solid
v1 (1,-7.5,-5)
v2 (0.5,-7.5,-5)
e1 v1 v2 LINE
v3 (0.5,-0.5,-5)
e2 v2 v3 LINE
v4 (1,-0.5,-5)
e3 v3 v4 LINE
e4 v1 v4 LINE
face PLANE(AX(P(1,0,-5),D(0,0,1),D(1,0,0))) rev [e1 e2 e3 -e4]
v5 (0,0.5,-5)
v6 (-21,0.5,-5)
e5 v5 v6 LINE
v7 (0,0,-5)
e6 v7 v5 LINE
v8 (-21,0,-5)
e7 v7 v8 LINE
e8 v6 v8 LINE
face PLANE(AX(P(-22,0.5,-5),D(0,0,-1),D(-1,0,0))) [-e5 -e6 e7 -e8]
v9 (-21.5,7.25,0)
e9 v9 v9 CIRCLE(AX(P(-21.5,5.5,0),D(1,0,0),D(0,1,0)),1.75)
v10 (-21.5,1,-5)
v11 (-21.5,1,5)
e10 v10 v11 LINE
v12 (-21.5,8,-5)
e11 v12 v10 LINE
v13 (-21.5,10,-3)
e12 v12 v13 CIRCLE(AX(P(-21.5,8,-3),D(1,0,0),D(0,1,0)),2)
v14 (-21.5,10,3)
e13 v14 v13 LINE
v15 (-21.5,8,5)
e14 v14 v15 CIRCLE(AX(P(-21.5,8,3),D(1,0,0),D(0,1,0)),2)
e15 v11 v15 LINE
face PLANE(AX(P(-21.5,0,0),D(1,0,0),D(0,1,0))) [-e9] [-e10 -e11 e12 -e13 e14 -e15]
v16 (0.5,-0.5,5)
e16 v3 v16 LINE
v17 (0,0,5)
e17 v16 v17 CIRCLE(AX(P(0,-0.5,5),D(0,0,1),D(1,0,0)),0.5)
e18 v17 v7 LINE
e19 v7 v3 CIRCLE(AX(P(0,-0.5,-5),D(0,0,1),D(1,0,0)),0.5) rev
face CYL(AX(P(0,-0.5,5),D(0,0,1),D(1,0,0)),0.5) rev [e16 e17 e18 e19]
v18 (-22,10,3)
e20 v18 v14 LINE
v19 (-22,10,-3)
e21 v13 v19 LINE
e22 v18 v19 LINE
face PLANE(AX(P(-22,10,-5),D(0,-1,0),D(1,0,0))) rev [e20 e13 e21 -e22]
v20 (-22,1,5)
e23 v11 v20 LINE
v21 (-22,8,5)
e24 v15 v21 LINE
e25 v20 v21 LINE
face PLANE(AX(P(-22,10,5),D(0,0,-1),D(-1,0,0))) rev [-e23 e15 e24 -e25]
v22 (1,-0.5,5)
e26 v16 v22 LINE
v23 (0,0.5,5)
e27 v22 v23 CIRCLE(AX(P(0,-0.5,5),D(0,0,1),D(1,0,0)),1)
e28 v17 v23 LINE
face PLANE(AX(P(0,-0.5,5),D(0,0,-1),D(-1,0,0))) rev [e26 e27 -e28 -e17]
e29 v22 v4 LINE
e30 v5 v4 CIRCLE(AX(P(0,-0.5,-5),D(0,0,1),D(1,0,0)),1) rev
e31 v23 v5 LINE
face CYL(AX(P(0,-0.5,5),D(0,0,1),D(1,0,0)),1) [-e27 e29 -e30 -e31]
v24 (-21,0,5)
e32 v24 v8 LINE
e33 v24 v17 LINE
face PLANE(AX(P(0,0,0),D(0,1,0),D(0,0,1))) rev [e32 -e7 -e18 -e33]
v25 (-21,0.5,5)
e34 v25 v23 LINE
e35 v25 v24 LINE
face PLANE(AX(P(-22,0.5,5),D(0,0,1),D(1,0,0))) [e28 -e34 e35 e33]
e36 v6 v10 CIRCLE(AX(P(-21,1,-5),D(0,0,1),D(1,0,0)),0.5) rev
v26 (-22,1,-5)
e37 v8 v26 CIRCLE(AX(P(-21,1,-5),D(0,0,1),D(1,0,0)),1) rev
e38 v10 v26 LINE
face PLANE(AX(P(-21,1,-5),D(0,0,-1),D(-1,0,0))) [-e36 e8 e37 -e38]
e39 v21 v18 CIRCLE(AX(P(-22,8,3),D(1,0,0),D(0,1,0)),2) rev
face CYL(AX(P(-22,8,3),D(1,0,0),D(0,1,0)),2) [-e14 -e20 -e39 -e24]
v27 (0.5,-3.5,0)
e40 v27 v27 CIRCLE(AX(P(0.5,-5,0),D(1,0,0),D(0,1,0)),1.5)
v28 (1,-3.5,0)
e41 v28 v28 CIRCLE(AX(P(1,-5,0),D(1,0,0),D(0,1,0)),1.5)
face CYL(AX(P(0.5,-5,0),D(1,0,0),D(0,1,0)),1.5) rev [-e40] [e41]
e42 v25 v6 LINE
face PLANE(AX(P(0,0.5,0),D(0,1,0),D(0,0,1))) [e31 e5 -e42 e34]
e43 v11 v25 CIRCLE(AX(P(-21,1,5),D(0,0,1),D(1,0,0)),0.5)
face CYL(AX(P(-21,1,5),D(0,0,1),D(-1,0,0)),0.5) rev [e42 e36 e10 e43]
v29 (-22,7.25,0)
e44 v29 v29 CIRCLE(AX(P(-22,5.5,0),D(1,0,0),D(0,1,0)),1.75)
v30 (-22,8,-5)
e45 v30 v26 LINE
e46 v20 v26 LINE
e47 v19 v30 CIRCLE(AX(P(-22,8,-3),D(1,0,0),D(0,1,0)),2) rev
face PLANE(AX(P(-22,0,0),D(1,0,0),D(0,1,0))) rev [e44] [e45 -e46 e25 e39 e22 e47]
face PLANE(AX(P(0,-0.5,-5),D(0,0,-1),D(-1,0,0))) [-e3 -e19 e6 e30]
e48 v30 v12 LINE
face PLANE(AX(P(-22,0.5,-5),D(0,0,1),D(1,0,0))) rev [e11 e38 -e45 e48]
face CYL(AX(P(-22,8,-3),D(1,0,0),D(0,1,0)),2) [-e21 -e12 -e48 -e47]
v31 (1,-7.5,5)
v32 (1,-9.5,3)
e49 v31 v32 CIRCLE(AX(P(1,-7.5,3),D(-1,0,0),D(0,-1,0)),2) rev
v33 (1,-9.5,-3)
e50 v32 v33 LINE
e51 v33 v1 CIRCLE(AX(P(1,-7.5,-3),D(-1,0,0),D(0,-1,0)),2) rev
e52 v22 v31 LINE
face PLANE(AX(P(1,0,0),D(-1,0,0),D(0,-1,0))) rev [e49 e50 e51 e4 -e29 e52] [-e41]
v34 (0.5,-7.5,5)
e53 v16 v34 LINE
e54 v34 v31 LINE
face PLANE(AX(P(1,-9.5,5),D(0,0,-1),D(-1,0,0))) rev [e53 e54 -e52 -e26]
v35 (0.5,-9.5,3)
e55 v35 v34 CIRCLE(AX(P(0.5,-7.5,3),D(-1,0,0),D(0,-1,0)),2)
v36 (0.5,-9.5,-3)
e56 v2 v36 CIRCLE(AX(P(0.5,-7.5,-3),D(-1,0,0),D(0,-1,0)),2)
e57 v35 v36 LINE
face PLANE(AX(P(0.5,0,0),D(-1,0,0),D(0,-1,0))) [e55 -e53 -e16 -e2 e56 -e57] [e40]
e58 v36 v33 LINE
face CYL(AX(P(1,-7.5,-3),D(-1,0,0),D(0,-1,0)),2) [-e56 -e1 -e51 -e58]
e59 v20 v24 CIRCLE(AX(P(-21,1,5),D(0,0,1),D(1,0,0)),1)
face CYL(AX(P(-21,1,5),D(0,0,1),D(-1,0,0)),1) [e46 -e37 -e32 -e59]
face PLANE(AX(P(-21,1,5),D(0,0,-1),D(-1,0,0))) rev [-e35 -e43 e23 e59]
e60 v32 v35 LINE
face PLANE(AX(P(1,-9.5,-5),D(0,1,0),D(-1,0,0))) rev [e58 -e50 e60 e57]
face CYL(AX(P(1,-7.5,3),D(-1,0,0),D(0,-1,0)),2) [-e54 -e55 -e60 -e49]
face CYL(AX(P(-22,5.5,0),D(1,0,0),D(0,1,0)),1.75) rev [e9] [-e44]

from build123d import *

# Parameters (mm, degrees)
SKETCH_1_W                       = 23
SKETCH_1_H                       = 10
EXTRUDE_1_DEPTH                  = 0.5
SM_EDGE_FLANGE_1_STRIP_W         = 3
SM_EDGE_FLANGE_1_STRIP_H         = 0.5
SM_EDGE_FLANGE_1_STRIP_CUT_DEPTH = 10
SM_EDGE_FLANGE_1_DEPTH           = 10
SM_EDGE_FLANGE_2_STRIP_W         = 3
SM_EDGE_FLANGE_2_STRIP_H         = 0.5
SM_EDGE_FLANGE_2_STRIP_CUT_DEPTH = 10
SM_EDGE_FLANGE_2_DEPTH           = 10
SKETCH_12_R                      = 1.5
CUT_EXTRUDE_1_DEPTH              = 0.5
SKETCH_13_R                      = 1.75
CUT_EXTRUDE_2_DEPTH              = 0.5
FILLET_1_R                       = 2


# Sheet-metal steps are written as plain solids
with BuildPart() as part:
    # Sketch 1 → Бобышка-Вытянуть1 (new body)
    with BuildSketch(Plane(origin=(0, 0, 0), x_dir=(1, 0, 0), z_dir=(0, 1, 0))):
        with Locations((-10.5, 0)):
            Rectangle(SKETCH_1_W, SKETCH_1_H)
    extrude(amount=EXTRUDE_1_DEPTH)

    # Ребро-кромка1 strip (across the edge) → Ребро-кромка1 strip cut (cut)
    with BuildSketch(Plane(origin=(1, 0, -5), x_dir=(-1, 0, 0), z_dir=(0, 0, 1))):
        with Locations((-0.5, -0.25)):
            Rectangle(SM_EDGE_FLANGE_1_STRIP_W, SM_EDGE_FLANGE_1_STRIP_H)
    extrude(amount=SM_EDGE_FLANGE_1_STRIP_CUT_DEPTH, mode=Mode.SUBTRACT)

    # Ребро-кромка1 section (across the edge) → Ребро-кромка1 (add)
    with BuildSketch(Plane(origin=(1, 0, -5), x_dir=(-1, 0, 0), z_dir=(0, 0, 1))):
        with BuildLine():
            Line((0, 0.5), (0, 9.5))
            Line((0, 9.5), (0.5, 9.5))
            Line((0.5, 9.5), (0.5, 0.5))
            ThreePointArc((0.5, 0.5), (0.646446609, 0.146446609), (1, 0))
            Line((1, 0), (1, -0.5))
            ThreePointArc((1, -0.5), (0.292893219, -0.207106781), (0, 0.5))
        make_face()
    extrude(amount=SM_EDGE_FLANGE_1_DEPTH)

    # Ребро-кромка2 strip (across the edge) → Ребро-кромка2 strip cut (cut)
    with BuildSketch(Plane(origin=(-22, 0.5, -5), x_dir=(1, 0, 0), z_dir=(0, 0, 1))):
        with Locations((-0.5, -0.25)):
            Rectangle(SM_EDGE_FLANGE_2_STRIP_W, SM_EDGE_FLANGE_2_STRIP_H)
    extrude(amount=SM_EDGE_FLANGE_2_STRIP_CUT_DEPTH, mode=Mode.SUBTRACT)

    # Ребро-кромка2 section (across the edge) → Ребро-кромка2 (add)
    with BuildSketch(Plane(origin=(-22, 0.5, -5), x_dir=(1, 0, 0), z_dir=(0, 0, 1))):
        with BuildLine():
            Line((0, 0.5), (0, 9.5))
            Line((0, 9.5), (0.5, 9.5))
            Line((0.5, 9.5), (0.5, 0.5))
            ThreePointArc((0.5, 0.5), (0.646446609, 0.146446609), (1, 0))
            Line((1, 0), (1, -0.5))
            ThreePointArc((1, -0.5), (0.292893219, -0.207106781), (0, 0.5))
        make_face()
    extrude(amount=SM_EDGE_FLANGE_2_DEPTH)

    # Эскиз12 → Вырез-Вытянуть1 (cut)
    with BuildSketch(Plane(origin=(1, 0, 0), x_dir=(0, 0, -1), z_dir=(1, 0, 0))):
        with Locations(Location((0, -5, 0), (0, 0, 90))):
            Circle(SKETCH_12_R)
    extrude(amount=-CUT_EXTRUDE_1_DEPTH, mode=Mode.SUBTRACT)

    # Эскиз13 → Вырез-Вытянуть2 (cut)
    with BuildSketch(Plane(origin=(-21.5, 0, 0), x_dir=(0, 0, -1), z_dir=(1, 0, 0))):
        with Locations(Location((0, 5.5, 0), (0, 0, 90))):
            Circle(SKETCH_13_R)
    extrude(amount=-CUT_EXTRUDE_2_DEPTH, mode=Mode.SUBTRACT)

    # Скругление1
    fillet_1_edges = [part.edges().sort_by_distance(p)[0] for p in [
        (0.75, -9.5, -5),
        (0.75, -9.5, 5),
        (-21.75, 10, -5),
        (-21.75, 10, 5),
    ]]
    fillet(fillet_1_edges, radius=FILLET_1_R)


solid = part.part
